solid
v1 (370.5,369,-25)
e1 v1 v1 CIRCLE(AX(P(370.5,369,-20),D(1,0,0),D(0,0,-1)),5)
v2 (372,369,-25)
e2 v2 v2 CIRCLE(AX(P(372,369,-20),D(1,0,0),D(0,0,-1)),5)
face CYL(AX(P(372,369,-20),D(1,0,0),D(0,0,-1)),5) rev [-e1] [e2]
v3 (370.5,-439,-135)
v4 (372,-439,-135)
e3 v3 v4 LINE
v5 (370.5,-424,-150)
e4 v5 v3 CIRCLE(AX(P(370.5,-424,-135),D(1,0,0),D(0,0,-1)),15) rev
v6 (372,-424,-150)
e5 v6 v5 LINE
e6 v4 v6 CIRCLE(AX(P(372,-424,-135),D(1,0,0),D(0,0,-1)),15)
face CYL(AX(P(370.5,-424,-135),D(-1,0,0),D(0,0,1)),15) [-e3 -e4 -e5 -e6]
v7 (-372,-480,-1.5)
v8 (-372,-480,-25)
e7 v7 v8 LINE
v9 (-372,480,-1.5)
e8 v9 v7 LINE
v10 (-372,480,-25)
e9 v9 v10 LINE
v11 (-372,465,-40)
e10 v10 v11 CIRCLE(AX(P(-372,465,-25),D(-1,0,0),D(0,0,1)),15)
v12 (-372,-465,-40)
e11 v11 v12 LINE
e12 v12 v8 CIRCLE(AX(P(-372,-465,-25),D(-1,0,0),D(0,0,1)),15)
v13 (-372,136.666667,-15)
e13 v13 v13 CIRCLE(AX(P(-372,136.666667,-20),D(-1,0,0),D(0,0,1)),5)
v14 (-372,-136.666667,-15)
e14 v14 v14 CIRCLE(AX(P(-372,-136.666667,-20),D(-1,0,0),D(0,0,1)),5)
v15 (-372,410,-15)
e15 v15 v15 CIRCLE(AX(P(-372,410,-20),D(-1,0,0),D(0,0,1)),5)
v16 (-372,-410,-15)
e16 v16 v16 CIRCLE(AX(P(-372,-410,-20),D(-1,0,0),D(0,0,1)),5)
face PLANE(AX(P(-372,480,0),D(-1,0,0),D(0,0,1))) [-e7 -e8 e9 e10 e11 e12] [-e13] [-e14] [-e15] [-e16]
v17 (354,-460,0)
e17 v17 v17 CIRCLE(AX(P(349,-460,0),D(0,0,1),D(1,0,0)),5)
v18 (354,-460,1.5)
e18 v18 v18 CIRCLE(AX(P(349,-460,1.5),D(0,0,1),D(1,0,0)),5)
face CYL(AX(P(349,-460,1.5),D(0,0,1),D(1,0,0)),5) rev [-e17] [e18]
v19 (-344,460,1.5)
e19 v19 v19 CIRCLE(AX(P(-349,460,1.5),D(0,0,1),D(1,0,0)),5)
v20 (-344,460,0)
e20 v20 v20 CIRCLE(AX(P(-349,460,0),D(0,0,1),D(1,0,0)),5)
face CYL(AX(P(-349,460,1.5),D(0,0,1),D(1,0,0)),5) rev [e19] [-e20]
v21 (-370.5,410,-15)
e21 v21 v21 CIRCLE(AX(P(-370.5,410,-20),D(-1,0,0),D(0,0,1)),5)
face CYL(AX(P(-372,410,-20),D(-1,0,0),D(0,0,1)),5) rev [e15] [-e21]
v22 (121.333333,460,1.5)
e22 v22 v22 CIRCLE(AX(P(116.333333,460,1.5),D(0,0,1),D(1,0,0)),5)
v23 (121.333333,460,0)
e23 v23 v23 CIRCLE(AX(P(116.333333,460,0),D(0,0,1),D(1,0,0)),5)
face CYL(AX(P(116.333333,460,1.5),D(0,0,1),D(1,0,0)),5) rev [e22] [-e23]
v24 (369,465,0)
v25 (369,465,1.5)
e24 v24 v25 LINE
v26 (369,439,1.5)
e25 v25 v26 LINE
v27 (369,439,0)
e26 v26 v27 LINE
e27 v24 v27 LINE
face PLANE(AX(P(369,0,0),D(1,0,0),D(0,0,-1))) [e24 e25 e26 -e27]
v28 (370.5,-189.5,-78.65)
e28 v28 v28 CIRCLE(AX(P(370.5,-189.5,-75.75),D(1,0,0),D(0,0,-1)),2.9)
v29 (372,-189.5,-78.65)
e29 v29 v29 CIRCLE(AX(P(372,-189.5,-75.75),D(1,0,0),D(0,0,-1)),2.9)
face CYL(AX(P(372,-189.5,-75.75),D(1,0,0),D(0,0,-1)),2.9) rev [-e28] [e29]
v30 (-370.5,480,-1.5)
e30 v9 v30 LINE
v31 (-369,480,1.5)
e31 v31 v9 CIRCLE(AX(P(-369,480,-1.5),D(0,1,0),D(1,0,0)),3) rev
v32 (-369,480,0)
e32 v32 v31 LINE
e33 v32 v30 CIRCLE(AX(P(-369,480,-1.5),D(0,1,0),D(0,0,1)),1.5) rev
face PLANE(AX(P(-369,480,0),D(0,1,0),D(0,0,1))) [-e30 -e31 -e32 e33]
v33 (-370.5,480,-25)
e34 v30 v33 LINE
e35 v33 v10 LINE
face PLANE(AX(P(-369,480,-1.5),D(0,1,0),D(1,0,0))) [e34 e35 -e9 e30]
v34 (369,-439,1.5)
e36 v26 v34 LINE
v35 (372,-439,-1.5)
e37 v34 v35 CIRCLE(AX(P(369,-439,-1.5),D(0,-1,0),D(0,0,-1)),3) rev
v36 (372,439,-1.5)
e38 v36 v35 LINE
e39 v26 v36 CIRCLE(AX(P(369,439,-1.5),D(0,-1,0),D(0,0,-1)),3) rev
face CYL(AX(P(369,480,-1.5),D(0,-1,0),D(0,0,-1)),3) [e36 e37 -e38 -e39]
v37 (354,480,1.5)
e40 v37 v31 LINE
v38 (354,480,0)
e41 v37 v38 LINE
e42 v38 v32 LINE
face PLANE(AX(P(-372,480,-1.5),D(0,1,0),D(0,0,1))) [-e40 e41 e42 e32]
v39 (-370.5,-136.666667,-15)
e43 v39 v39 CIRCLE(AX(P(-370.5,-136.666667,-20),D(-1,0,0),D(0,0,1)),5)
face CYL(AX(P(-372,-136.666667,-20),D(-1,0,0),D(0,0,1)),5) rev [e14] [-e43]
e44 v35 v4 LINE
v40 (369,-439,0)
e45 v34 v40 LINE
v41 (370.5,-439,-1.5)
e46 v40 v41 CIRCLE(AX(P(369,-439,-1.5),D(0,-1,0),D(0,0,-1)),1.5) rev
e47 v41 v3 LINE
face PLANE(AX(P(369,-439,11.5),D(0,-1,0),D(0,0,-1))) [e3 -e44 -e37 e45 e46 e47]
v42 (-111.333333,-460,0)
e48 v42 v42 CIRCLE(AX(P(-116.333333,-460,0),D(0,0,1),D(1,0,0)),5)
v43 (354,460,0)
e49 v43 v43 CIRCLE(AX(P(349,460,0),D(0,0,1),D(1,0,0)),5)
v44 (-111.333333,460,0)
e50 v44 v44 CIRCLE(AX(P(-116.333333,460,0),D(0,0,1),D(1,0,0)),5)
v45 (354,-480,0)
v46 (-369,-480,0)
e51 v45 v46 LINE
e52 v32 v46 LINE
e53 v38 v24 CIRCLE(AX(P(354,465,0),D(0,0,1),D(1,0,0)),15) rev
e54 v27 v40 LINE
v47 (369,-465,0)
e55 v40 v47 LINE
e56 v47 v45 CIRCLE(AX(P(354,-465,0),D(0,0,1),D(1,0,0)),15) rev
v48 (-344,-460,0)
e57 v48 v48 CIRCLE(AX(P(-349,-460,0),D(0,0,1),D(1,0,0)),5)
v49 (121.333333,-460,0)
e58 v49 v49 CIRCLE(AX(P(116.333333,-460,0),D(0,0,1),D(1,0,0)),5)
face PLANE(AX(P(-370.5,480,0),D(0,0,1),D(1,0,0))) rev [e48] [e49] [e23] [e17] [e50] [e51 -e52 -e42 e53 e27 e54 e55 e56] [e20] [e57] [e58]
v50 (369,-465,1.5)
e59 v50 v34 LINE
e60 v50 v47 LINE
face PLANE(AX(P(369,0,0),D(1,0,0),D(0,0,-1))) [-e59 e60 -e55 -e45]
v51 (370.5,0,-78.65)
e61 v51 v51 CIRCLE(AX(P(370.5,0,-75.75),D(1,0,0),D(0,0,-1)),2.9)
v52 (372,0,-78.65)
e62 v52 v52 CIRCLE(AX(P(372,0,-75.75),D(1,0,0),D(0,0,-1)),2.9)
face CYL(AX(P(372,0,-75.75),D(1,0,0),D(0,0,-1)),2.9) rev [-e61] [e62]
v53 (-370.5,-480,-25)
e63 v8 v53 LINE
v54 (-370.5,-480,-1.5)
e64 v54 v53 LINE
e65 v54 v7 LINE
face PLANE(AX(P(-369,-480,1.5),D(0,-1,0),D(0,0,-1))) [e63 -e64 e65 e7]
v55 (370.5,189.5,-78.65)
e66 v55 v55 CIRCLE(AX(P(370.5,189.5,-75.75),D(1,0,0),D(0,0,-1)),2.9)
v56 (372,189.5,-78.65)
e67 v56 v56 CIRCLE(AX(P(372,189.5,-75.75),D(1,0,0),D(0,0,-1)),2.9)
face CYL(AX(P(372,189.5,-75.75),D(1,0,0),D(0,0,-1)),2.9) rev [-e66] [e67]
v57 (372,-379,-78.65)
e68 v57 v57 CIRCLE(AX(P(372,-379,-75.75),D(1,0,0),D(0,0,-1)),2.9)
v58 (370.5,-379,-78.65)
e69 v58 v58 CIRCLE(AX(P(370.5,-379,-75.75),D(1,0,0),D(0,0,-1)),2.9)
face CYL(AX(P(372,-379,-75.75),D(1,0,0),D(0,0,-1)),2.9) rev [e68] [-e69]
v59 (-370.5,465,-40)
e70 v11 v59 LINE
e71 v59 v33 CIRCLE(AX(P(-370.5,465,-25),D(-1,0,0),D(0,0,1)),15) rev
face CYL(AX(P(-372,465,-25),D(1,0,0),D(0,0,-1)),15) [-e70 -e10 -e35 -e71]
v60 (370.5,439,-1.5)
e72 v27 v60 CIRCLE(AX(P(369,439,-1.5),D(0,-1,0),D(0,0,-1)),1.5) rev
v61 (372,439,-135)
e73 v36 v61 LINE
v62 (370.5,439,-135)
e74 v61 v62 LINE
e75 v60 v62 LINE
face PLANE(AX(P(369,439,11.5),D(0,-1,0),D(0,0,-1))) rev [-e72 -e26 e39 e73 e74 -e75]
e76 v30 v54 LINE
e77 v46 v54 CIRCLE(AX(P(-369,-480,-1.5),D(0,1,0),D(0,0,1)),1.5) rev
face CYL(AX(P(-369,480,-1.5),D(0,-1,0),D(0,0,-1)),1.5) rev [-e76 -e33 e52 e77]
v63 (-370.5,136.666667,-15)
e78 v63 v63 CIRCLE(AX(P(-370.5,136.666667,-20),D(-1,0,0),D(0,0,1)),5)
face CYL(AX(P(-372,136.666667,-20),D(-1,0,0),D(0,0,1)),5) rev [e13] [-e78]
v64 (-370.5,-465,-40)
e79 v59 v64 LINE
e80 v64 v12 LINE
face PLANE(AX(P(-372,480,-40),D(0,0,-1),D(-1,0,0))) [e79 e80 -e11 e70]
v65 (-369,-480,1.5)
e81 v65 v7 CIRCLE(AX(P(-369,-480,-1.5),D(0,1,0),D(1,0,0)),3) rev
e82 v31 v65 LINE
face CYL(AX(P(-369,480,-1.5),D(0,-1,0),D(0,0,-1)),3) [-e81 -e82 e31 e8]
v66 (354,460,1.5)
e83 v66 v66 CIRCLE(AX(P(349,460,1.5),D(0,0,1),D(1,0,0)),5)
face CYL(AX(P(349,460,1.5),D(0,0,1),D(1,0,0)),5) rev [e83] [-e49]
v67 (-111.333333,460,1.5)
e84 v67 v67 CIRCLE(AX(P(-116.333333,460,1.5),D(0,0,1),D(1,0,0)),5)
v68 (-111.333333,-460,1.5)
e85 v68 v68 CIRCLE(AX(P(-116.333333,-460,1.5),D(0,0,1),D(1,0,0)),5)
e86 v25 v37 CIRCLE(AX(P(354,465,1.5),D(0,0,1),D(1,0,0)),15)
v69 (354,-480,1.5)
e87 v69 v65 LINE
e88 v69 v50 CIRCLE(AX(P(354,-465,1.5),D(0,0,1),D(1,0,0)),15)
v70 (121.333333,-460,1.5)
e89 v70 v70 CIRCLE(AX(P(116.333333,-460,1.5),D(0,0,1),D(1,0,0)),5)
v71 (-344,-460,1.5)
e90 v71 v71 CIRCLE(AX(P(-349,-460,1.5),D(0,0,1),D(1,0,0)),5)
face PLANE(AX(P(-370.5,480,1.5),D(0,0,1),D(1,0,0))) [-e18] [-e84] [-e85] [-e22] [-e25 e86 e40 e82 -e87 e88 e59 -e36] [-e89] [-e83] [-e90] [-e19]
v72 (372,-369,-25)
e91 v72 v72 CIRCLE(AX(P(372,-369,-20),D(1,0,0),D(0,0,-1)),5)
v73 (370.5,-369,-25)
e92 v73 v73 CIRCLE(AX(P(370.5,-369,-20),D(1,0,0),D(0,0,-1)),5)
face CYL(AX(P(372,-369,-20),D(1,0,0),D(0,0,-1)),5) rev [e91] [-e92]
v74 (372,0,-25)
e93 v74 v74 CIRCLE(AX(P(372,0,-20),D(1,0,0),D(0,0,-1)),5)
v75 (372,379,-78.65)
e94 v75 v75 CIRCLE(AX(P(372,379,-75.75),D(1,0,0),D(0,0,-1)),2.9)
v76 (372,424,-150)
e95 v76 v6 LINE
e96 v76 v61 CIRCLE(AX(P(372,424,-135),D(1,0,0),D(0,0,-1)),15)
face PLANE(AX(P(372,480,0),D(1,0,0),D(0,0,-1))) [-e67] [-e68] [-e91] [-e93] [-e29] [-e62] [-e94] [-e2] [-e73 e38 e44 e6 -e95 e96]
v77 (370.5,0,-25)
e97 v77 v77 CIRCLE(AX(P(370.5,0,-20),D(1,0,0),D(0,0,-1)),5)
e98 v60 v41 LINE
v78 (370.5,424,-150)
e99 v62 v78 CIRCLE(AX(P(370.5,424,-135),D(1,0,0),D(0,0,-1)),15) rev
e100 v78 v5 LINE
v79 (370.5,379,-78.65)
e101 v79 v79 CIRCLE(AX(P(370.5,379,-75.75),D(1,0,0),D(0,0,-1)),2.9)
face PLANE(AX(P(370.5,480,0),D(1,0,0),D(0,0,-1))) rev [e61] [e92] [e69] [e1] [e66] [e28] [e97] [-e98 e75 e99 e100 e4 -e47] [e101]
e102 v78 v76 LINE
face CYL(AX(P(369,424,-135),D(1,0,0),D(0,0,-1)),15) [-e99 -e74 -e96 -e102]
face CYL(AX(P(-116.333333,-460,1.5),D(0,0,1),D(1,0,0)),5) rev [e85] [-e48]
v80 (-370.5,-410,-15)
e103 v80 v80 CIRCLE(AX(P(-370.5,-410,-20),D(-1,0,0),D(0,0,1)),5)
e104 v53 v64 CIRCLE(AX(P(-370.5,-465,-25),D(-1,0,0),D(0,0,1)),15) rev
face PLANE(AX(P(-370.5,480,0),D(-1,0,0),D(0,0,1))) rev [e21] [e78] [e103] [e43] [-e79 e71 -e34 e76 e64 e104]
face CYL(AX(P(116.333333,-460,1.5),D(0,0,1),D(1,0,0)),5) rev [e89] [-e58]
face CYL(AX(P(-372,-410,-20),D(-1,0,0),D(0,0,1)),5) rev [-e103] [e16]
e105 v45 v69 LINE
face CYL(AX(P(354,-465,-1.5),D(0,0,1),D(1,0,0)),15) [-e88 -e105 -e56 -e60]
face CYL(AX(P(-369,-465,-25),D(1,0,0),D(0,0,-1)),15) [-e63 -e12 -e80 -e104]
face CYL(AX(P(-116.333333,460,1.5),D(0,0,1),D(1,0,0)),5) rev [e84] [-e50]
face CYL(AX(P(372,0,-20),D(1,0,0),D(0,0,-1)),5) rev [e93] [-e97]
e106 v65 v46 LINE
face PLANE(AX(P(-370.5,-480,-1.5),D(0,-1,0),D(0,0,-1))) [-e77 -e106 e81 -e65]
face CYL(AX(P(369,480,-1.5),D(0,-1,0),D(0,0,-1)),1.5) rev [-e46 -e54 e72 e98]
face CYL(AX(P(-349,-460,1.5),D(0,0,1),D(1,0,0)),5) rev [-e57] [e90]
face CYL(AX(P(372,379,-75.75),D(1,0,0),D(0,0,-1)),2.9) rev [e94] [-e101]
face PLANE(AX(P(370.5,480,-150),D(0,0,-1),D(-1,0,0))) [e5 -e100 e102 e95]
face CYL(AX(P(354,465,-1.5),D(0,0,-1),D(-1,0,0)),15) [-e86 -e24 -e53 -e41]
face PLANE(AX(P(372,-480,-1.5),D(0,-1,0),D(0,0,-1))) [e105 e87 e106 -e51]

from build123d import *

# Parameters (mm, degrees)
BASE_FLANGE1_DEPTH       = 480
CUT_EXTRUDE1_START       = -3
SKETCH6_W                = 170
SKETCH6_H                = 41
CUT_EXTRUDE1_DEPTH       = 902.017817195
M5_CLEARANCE_HOLE1_D     = 5.8
FILLET1_R                = 15
M8_CLEARANCE_HOLE1_D     = 10
M8_CLEARANCE_HOLE2_D     = 10
M8_CLEARANCE_HOLE2_DEPTH = 8.995696905
M8_CLEARANCE_HOLE2_TIP   = 3.004303095
M8_CLEARANCE_HOLE3_D     = 10
M8_CLEARANCE_HOLE3_DEPTH = 8.995696905
M8_CLEARANCE_HOLE3_TIP   = 3.004303095


# Sheet-metal steps are written as plain solids
with BuildPart() as part:
    # Sketch1 → Base-Flange1 (new, symmetric)
    with BuildSketch(Plane(origin=(0, 0, 0), x_dir=(1, 0, 0), z_dir=(0, 1, 0))):
        with BuildLine():
            Line((-370.5, 40), (-370.5, 1.5))
            ThreePointArc((-370.5, 1.5), (-370.060660172, 0.439339828), (-369, 0))
            Line((-369, 0), (369, 0))
            ThreePointArc((369, 0), (370.060660172, 0.439339828), (370.5, 1.5))
            Line((370.5, 1.5), (370.5, 150))
            Line((370.5, 150), (372, 150))
            Line((372, 150), (372, 1.5))
            ThreePointArc((372, 1.5), (371.121320344, -0.621320344), (369, -1.5))
            Line((369, -1.5), (-369, -1.5))
            ThreePointArc((-369, -1.5), (-371.121320344, -0.621320344), (-372, 1.5))
            Line((-372, 1.5), (-372, 40))
            Line((-372, 40), (-370.5, 40))
        make_face()
    extrude(amount=BASE_FLANGE1_DEPTH, both=True)

    # Sketch6 → Cut-Extrude1 (cut)
    with BuildSketch(Plane(origin=(372, 0, 0), x_dir=(0, 0, -1), z_dir=(1, 0, 0)).offset(CUT_EXTRUDE1_START)):
        with Locations((73.5, 459.5)):
            Rectangle(SKETCH6_W, SKETCH6_H)
    cut_extrude1 = extrude(amount=CUT_EXTRUDE1_DEPTH, mode=Mode.SUBTRACT)

    # Mirror1: Cut-Extrude1 across plane
    add(cut_extrude1.mirror(Plane.ZX), mode=Mode.SUBTRACT)

    # M5 Clearance Hole1 (through all)
    with Locations(Plane(origin=(372, 0, 0), x_dir=(0, 0, -1), z_dir=(1, 0, 0))):
        with Locations((75.75, 379), (75.75, 189.5), (75.75, 0), (75.75, -189.5), (75.75, -379)):
            Hole(M5_CLEARANCE_HOLE1_D / 2)

    # Fillet1
    fillet1_edges = [part.edges().sort_by_distance(p)[0] for p in [
        (-371.25, -480, -40),
        (369, -480, 0.75),
        (369, 480, 0.75),
        (371.25, 439, -150),
        (371.25, -439, -150),
        (-371.25, 480, -40),
    ]]
    fillet(fillet1_edges, radius=FILLET1_R)

    # M8 Clearance Hole1 (through all)
    with Locations(Plane.XY.offset(1.5)):
        with Locations((349, 460), (116.333333333, 460), (-116.333333333, 460), (-349, 460)):
            m8_clearance_hole1 = Hole(M8_CLEARANCE_HOLE1_D / 2)

    # Mirror2: M8 Clearance Hole1 across plane
    add(m8_clearance_hole1.mirror(Plane.ZX), mode=Mode.SUBTRACT)

    # M8 Clearance Hole2
    with Locations(Plane.ZY.offset(372)):
        with Locations((-20, 410), (-20, 136.666666667), (-20, -136.666666667), (-20, -410)):
            Hole(M8_CLEARANCE_HOLE2_D / 2, depth=M8_CLEARANCE_HOLE2_DEPTH)
            with Locations((0, 0, -(M8_CLEARANCE_HOLE2_DEPTH + M8_CLEARANCE_HOLE2_TIP / 2))):  # 118° drill point
                Cone(0, M8_CLEARANCE_HOLE2_D / 2, M8_CLEARANCE_HOLE2_TIP, mode=Mode.SUBTRACT)

    # M8 Clearance Hole3
    with Locations(Plane(origin=(372, 0, 0), x_dir=(0, 0, -1), z_dir=(1, 0, 0))):
        with Locations((20, 369), (20, 0), (20, -369)):
            Hole(M8_CLEARANCE_HOLE3_D / 2, depth=M8_CLEARANCE_HOLE3_DEPTH)
            with Locations((0, 0, -(M8_CLEARANCE_HOLE3_DEPTH + M8_CLEARANCE_HOLE3_TIP / 2))):  # 118° drill point
                Cone(0, M8_CLEARANCE_HOLE3_D / 2, M8_CLEARANCE_HOLE3_TIP, mode=Mode.SUBTRACT)


solid = part.part
